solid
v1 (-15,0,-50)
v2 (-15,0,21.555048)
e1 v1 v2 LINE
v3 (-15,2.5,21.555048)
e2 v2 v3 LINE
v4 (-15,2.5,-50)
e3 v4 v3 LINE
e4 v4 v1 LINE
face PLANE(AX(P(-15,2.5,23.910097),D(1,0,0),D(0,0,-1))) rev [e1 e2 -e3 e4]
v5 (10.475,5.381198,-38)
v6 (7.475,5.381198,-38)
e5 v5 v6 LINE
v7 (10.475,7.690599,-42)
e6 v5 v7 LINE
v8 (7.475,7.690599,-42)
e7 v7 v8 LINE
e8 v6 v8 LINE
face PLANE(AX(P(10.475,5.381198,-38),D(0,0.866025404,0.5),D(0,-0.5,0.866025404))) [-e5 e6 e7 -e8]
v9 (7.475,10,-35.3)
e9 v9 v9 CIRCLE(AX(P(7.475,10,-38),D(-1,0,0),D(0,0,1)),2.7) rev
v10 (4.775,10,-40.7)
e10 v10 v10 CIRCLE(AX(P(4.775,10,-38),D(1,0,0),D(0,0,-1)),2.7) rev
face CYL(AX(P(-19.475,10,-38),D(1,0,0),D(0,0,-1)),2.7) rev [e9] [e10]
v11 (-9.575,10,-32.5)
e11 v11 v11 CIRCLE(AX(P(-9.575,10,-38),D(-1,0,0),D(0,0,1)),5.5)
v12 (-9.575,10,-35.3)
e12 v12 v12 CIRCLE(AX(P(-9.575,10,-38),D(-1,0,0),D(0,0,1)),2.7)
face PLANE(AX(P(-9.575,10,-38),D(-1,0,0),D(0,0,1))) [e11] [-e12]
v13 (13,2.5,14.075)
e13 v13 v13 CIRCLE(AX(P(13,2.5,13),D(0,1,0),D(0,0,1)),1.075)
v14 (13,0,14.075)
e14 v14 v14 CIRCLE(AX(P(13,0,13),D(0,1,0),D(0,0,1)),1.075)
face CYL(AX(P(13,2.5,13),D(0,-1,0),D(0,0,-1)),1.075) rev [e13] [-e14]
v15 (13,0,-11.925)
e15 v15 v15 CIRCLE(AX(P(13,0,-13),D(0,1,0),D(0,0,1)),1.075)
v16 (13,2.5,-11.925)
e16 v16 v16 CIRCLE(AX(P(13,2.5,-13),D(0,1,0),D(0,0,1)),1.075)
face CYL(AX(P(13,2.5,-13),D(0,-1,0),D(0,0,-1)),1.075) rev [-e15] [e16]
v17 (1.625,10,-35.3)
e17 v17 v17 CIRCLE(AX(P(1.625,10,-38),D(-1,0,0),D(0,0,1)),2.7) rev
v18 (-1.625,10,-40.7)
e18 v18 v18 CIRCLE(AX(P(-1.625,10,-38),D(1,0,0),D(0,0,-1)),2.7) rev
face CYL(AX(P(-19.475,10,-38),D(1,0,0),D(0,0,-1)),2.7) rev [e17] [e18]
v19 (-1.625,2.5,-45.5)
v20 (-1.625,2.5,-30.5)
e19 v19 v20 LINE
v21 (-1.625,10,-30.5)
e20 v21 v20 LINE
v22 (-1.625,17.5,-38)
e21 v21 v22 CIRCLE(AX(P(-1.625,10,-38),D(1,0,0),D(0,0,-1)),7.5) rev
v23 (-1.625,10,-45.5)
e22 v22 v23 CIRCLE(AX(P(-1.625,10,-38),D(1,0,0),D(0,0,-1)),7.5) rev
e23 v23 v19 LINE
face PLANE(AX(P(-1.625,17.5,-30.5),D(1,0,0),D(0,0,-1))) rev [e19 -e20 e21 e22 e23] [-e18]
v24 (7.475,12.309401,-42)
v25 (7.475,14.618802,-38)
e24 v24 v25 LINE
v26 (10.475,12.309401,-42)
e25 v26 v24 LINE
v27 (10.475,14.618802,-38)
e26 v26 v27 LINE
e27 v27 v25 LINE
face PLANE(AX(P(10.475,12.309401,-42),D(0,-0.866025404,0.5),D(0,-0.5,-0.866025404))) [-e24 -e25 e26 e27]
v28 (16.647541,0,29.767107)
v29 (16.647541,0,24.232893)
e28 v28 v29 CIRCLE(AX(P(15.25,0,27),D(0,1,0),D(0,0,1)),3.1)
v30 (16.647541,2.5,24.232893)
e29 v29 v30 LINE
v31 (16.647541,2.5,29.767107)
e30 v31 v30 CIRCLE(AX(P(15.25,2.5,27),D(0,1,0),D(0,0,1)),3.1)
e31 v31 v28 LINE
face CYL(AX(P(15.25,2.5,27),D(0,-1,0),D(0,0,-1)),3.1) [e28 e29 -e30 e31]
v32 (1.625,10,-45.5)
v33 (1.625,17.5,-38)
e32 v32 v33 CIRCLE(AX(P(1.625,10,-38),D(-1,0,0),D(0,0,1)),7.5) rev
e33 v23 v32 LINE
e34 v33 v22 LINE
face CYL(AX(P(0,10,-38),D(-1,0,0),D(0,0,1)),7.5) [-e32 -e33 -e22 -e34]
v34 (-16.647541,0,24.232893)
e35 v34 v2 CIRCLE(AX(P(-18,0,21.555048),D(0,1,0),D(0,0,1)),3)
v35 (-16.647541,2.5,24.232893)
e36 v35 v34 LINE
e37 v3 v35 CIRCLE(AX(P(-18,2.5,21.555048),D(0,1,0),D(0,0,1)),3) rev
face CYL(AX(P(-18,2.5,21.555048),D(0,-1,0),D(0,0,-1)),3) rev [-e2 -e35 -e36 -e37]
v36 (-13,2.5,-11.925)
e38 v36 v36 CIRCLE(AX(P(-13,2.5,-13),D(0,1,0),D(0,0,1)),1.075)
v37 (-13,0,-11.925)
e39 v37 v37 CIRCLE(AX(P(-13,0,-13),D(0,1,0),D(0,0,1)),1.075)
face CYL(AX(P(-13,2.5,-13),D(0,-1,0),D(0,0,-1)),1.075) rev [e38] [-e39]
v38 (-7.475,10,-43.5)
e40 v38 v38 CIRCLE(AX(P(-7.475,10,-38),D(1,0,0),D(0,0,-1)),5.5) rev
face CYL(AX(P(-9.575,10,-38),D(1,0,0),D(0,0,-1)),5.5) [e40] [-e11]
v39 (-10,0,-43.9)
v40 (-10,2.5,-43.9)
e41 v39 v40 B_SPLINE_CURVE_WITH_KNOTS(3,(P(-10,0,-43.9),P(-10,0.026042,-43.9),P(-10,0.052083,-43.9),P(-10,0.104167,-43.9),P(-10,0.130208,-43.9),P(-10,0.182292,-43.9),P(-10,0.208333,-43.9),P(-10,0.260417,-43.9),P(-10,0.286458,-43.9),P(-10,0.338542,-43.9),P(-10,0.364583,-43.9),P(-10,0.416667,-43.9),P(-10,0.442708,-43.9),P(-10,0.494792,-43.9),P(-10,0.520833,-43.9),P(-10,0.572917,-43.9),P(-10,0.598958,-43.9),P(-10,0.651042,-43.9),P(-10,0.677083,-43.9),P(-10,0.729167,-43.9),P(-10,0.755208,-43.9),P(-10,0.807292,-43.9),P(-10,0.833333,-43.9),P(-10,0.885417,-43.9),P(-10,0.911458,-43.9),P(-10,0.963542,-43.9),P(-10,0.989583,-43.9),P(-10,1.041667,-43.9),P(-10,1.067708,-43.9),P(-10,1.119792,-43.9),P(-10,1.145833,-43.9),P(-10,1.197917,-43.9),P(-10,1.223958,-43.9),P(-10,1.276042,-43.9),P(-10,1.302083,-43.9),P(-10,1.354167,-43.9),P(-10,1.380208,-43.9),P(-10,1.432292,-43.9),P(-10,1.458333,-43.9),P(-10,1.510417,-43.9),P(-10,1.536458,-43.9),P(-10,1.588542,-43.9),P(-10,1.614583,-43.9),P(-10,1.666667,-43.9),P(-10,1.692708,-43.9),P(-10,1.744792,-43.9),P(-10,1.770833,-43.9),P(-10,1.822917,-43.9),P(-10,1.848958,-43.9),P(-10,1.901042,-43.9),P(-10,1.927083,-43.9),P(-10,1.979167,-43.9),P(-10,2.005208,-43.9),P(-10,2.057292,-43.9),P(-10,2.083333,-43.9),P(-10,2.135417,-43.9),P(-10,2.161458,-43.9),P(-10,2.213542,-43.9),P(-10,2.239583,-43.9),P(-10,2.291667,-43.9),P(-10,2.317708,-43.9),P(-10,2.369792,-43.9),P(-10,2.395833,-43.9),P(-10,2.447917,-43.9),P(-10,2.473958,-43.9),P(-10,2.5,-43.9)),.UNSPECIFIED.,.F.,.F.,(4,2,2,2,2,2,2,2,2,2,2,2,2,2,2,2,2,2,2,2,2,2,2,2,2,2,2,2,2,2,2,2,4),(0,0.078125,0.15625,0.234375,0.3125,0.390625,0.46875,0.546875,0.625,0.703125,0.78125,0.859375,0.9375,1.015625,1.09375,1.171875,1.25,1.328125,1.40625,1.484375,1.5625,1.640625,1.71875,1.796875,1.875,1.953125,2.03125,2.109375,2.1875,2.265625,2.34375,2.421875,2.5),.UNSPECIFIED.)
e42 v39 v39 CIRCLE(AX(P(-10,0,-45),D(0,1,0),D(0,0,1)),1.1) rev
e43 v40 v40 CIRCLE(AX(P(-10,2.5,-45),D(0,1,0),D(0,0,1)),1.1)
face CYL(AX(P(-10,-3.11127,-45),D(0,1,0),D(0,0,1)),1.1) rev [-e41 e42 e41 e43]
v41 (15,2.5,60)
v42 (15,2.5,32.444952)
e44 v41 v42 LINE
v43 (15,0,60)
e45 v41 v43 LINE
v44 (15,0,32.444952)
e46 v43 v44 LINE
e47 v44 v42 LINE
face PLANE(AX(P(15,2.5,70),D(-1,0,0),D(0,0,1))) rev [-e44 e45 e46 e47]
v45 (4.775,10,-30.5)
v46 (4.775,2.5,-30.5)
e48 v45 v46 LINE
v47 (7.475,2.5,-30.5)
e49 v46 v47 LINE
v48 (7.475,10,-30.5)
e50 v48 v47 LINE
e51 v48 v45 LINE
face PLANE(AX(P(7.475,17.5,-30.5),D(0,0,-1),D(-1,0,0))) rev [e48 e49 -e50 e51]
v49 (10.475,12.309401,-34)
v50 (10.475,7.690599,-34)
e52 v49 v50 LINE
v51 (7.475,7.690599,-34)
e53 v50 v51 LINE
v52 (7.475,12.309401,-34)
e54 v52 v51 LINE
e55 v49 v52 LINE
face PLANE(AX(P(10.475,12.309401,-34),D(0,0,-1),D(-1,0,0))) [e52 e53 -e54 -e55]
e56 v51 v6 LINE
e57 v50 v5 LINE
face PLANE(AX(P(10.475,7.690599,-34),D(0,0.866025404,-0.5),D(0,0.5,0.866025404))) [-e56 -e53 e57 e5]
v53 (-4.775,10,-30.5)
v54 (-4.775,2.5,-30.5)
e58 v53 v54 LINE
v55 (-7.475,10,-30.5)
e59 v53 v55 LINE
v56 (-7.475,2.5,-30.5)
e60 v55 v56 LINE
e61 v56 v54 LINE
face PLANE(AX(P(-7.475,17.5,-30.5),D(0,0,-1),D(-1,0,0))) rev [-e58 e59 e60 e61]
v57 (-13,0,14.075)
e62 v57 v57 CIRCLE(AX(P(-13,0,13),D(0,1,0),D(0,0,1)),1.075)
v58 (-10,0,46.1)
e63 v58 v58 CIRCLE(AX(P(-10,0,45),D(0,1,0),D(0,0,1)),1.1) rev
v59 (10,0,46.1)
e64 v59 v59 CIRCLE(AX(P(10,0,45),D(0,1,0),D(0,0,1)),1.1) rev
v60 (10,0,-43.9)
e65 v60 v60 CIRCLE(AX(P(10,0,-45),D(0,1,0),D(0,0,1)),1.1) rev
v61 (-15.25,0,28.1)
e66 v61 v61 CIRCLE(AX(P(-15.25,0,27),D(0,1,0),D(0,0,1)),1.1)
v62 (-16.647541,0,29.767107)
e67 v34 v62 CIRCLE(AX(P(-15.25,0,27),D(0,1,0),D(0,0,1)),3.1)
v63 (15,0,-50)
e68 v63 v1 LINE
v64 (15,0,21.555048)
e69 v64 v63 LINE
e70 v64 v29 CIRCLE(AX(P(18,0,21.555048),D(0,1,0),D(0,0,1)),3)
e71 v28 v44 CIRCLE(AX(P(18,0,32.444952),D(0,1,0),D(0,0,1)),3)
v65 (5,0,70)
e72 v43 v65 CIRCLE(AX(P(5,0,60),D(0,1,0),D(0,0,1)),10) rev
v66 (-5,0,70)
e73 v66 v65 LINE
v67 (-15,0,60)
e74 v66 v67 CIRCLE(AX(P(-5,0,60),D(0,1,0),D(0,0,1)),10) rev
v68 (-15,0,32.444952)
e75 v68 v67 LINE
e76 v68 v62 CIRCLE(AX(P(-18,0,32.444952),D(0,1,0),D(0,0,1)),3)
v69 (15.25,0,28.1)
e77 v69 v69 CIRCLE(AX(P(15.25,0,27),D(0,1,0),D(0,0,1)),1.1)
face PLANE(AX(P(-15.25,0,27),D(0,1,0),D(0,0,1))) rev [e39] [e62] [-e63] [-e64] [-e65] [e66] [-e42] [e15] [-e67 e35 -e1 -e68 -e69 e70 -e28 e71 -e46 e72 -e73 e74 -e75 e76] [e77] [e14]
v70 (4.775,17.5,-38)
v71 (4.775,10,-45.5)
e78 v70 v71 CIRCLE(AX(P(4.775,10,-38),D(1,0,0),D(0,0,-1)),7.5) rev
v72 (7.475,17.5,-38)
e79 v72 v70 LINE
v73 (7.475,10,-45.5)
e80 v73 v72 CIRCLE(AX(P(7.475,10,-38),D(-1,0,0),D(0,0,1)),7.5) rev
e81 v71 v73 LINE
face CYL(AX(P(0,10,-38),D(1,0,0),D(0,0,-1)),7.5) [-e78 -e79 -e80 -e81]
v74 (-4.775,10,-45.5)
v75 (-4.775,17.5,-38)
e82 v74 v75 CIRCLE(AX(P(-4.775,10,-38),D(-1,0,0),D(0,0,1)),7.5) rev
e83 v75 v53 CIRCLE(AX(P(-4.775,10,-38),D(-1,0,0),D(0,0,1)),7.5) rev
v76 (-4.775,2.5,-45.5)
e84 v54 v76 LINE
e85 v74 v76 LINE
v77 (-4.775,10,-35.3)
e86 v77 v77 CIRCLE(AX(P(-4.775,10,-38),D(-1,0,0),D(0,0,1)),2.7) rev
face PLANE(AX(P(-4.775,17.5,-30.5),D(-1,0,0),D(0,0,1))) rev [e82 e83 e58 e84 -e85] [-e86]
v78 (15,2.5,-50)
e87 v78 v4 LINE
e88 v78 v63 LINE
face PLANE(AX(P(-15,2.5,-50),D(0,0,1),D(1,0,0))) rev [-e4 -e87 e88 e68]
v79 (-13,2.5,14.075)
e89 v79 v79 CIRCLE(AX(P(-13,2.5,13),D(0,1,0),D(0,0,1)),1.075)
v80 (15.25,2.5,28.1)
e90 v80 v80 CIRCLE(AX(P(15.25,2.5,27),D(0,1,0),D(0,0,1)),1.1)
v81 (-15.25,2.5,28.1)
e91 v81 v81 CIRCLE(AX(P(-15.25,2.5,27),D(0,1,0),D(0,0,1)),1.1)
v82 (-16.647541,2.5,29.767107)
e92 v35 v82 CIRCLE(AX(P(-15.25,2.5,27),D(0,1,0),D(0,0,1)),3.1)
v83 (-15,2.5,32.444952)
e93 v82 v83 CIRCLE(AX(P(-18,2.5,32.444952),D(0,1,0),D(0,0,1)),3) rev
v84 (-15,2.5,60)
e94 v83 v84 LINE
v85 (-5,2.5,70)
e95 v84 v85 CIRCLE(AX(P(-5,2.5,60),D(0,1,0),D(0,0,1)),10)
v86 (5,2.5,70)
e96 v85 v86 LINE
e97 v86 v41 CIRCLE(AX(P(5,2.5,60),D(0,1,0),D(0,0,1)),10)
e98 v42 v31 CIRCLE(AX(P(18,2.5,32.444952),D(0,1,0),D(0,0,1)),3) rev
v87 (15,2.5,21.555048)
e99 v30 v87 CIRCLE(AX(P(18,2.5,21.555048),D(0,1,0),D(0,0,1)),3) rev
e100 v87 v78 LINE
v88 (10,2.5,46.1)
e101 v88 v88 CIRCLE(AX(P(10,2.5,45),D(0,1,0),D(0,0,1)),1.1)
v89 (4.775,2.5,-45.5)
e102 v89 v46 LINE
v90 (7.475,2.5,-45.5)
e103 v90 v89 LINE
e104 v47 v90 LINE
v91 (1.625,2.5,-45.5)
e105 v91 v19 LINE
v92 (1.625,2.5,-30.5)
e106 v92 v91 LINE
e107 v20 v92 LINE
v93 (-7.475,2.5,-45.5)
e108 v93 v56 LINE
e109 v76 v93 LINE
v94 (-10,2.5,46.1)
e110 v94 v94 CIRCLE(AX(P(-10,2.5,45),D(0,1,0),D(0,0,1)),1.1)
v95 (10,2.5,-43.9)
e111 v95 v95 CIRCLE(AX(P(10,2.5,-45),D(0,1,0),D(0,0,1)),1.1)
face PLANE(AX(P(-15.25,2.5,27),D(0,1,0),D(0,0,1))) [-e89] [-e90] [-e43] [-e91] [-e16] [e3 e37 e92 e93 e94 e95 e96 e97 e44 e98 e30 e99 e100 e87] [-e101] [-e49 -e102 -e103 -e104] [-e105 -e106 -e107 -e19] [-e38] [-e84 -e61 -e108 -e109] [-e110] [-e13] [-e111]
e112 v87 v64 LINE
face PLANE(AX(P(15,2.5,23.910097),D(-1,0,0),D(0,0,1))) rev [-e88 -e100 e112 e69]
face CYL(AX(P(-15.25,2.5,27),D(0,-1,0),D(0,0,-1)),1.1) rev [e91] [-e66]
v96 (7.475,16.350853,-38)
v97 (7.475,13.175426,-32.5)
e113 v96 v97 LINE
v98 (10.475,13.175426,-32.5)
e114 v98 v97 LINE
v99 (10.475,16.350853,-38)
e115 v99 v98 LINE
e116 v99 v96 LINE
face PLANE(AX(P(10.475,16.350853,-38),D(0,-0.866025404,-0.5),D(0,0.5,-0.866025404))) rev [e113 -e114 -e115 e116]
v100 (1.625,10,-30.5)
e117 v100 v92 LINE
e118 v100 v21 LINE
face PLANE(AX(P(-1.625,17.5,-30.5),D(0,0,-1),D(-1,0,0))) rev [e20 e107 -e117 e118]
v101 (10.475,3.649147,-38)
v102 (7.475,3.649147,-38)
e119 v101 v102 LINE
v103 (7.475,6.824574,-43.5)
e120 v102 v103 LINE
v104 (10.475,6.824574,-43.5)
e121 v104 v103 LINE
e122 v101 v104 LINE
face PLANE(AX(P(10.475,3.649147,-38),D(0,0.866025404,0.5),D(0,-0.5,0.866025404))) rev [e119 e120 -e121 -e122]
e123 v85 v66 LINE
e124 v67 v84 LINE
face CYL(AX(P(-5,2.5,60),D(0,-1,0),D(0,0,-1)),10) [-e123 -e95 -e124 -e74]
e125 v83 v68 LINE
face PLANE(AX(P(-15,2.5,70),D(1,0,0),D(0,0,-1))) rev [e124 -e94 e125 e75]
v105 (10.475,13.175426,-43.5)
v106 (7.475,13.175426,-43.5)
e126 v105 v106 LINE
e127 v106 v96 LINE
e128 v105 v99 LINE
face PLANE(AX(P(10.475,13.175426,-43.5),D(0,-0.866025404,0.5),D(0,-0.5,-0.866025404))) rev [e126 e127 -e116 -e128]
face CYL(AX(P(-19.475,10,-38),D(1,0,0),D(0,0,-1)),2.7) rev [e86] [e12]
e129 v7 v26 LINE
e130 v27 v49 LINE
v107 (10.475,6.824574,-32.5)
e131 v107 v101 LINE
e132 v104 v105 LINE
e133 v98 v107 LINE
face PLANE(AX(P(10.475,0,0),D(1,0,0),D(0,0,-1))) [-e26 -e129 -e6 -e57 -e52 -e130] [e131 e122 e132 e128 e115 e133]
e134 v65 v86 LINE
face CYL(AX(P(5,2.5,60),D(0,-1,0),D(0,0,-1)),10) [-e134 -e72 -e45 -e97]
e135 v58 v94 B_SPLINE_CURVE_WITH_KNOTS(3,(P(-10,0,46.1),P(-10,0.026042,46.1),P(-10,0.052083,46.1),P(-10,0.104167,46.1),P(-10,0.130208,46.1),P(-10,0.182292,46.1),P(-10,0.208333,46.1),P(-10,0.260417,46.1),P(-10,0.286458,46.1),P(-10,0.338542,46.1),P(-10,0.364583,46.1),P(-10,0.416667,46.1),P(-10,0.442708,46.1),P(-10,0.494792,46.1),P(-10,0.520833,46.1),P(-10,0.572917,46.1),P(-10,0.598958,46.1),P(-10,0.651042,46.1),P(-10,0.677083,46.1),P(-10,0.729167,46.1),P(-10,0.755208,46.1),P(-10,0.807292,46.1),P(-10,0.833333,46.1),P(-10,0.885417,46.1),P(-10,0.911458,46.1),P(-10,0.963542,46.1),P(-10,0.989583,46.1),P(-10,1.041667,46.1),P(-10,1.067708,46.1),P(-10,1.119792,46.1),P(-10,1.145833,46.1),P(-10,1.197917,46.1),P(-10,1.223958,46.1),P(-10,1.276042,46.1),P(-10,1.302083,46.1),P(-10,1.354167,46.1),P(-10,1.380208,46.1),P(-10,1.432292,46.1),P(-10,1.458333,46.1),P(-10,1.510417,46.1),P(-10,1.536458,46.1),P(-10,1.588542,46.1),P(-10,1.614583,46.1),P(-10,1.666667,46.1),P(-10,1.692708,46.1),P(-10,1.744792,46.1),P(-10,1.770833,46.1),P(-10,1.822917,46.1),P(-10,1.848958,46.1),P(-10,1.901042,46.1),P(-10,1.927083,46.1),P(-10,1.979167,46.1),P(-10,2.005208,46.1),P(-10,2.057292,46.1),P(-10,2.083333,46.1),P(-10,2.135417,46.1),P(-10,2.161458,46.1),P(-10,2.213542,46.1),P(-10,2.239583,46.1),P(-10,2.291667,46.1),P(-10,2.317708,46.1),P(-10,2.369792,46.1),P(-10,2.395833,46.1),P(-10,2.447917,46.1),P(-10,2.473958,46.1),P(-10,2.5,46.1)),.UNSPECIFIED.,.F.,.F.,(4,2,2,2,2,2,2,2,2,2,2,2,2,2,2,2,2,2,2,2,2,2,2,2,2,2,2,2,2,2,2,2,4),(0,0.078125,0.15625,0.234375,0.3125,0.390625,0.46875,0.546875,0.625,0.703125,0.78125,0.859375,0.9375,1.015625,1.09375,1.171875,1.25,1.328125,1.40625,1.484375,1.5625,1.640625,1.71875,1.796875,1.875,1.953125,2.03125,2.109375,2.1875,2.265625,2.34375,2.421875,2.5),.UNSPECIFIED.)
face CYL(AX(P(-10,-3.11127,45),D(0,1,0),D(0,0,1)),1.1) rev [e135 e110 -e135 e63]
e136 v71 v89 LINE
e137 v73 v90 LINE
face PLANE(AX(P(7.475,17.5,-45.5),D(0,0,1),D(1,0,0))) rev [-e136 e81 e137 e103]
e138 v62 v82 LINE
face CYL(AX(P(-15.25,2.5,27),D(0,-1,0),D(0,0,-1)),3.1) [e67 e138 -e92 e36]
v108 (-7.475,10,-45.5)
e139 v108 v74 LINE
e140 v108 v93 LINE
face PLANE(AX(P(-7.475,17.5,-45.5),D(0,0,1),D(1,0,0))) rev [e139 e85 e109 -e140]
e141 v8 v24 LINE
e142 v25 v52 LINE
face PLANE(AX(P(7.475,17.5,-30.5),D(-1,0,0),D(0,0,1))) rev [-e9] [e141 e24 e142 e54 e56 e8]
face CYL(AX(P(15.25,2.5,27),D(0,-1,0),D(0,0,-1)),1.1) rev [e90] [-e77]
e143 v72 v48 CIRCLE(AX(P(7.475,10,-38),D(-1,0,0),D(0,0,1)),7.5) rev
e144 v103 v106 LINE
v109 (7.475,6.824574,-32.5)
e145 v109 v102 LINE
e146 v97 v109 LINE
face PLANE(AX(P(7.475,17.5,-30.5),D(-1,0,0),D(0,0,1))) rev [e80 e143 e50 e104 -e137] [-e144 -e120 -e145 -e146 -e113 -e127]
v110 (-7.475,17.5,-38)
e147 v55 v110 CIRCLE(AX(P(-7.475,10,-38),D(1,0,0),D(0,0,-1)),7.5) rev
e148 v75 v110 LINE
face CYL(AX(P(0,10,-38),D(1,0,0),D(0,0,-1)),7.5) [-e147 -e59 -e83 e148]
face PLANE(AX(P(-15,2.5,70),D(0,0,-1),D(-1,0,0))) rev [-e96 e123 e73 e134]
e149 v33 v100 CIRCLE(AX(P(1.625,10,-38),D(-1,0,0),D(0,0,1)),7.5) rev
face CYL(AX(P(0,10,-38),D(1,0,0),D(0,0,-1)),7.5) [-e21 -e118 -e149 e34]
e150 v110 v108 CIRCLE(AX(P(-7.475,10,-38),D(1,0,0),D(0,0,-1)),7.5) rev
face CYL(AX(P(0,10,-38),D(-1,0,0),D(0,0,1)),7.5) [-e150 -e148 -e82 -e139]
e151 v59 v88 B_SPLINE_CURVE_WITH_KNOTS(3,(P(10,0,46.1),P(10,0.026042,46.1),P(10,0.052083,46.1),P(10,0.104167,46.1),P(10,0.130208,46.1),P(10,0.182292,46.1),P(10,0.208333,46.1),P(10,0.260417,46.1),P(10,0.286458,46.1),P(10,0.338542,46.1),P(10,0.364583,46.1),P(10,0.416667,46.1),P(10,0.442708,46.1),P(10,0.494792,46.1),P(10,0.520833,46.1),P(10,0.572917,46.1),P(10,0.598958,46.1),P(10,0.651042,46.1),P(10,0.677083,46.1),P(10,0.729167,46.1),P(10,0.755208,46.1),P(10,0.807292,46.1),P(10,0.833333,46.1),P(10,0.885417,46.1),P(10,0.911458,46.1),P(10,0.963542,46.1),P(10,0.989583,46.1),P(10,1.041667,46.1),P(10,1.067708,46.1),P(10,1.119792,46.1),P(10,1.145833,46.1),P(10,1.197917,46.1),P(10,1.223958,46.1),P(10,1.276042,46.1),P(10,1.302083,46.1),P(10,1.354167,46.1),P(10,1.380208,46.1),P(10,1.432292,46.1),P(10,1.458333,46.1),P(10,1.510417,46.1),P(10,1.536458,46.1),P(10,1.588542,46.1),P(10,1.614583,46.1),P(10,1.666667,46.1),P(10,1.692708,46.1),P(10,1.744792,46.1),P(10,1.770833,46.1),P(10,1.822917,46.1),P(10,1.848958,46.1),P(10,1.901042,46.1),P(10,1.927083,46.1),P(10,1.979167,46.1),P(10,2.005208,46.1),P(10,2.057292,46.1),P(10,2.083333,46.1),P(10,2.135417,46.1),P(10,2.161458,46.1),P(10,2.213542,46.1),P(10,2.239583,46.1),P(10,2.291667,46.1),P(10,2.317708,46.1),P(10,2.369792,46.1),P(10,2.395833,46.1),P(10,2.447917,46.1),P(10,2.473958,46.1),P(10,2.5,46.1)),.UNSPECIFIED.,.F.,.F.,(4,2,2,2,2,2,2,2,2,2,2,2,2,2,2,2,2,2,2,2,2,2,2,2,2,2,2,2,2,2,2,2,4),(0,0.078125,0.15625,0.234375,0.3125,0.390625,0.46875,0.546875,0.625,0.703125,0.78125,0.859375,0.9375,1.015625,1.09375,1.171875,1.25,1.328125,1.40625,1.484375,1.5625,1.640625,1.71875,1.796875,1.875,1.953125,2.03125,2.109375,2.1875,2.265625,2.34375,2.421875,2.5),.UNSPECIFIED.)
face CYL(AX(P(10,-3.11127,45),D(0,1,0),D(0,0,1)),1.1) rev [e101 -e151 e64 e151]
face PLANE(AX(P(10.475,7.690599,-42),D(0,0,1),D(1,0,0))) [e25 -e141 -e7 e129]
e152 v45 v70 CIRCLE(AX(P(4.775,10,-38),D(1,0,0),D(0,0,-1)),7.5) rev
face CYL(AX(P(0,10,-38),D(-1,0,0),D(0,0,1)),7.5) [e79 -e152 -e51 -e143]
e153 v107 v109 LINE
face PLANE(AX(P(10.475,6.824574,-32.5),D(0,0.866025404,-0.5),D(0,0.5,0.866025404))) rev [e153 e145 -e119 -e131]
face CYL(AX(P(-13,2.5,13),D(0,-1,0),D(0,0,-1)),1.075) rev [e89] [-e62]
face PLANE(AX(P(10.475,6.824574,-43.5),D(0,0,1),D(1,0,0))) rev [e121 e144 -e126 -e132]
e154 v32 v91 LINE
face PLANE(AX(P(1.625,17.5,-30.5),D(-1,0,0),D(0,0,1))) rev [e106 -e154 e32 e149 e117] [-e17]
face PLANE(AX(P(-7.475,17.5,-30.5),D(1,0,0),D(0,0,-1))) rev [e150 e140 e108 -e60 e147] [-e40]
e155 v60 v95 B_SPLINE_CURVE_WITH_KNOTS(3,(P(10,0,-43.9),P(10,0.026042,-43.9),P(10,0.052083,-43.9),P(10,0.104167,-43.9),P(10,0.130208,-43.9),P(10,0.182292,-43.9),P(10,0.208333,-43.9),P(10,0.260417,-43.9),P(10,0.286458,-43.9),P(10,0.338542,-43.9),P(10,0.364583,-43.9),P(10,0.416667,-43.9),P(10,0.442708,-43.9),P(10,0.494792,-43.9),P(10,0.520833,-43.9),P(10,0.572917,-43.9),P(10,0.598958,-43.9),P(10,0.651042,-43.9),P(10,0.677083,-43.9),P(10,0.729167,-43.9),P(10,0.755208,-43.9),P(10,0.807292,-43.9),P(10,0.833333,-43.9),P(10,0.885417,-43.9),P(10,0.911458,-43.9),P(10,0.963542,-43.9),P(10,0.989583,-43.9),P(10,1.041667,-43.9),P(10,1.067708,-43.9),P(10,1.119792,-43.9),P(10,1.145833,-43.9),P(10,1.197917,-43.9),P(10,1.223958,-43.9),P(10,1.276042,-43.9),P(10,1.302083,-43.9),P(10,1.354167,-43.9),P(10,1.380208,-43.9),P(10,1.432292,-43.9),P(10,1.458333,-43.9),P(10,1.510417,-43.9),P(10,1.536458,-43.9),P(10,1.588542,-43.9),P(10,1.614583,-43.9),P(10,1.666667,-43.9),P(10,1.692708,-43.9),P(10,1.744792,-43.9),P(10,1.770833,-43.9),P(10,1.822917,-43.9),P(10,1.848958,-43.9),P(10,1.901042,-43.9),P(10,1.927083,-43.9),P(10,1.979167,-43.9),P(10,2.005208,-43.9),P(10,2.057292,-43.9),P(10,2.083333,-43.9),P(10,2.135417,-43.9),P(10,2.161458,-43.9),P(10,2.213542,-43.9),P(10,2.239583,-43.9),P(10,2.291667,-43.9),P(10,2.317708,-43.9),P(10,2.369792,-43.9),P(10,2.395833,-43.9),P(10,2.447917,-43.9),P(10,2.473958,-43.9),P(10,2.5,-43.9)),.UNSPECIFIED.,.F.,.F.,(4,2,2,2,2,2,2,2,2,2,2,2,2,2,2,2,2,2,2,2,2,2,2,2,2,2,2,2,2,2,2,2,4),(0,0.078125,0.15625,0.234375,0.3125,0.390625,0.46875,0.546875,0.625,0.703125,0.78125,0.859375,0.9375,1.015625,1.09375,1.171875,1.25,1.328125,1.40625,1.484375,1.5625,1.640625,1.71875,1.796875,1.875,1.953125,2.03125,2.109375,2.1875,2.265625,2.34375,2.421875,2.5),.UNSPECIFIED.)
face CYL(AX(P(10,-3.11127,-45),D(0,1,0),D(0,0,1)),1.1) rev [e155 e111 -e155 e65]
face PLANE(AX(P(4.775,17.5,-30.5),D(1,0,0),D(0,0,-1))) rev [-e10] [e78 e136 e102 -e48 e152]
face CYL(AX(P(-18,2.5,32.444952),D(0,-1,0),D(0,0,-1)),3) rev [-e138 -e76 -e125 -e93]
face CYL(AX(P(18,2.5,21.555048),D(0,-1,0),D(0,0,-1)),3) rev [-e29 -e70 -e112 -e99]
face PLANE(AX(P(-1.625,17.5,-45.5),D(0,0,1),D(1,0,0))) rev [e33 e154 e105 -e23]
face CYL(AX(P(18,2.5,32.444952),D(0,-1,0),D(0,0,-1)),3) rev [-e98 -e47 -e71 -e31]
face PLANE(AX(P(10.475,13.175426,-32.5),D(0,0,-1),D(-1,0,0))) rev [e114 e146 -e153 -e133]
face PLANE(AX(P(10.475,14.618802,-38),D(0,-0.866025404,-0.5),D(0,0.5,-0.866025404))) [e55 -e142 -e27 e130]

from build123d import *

# Parameters (mm, degrees)
SKETCH29_R              = 1.1
SKETCH29_R_2            = 1.075
BOSS_EXTRUDE19_DEPTH    = 2.5
SKETCH31_R              = 1.1
CUT_EXTRUDE2_DEPTH      = 2.5
SKETCH15_W              = 3.25
SKETCH15_H              = 15
SKETCH15_W_2            = 2.7
BOSS_EXTRUDE11_DEPTH    = 15
FILLET10_R              = 7.5
CUT_EXTRUDE1_DEPTH      = 12
CUT_EXTRUDE1_DEPTH_BACK = 17
SKETCH16_R              = 2.7
BOSS_EXTRUDE12_START    = 2.1
SKETCH17_R              = 5.5
SKETCH17_R_2            = 2.7
BOSS_EXTRUDE12_DEPTH    = 2.1
BOSS_EXTRUDE17_DEPTH    = 3
FILLET11_R              = 3
FILLET12_R              = 10


with BuildPart() as part:
    # Sketch29 → Boss-Extrude19 (new body)
    with BuildSketch(Plane(origin=(0, 0, 0), x_dir=(1, 0, 0), z_dir=(0, 1, 0))):
        with BuildLine():
            Line((-15, -70), (15, -70))
            Line((15, -70), (15, -30.089902911))
            ThreePointArc((15, -30.089902911), (18.35, -27), (15, -23.910097089))
            Line((15, -23.910097089), (15, 50))
            Line((15, 50), (-15, 50))
            Line((-15, 50), (-15, -23.910097089))
            ThreePointArc((-15, -23.910097089), (-18.35, -27), (-15, -30.089902911))
            Line((-15, -30.089902911), (-15, -70))
        make_face()
        with Locations(Location((-15.25, -27, 0), (0, 0, 270))):
            Circle(SKETCH29_R, mode=Mode.SUBTRACT)
        with Locations(Location((-13, 13, 0), (0, 0, 270))):
            Circle(SKETCH29_R_2, mode=Mode.SUBTRACT)
        with Locations(Location((13, 13, 0), (0, 0, 270))):
            Circle(SKETCH29_R_2, mode=Mode.SUBTRACT)
        with Locations(Location((13, -13, 0), (0, 0, 270))):
            Circle(SKETCH29_R_2, mode=Mode.SUBTRACT)
        with Locations(Location((-13, -13, 0), (0, 0, 270))):
            Circle(SKETCH29_R_2, mode=Mode.SUBTRACT)
        with Locations(Location((15.25, -27, 0), (0, 0, 270))):
            Circle(SKETCH29_R, mode=Mode.SUBTRACT)
    extrude(amount=BOSS_EXTRUDE19_DEPTH)

    # Sketch31 → Cut-Extrude2 (cut)
    with BuildSketch(Plane(origin=(0, 2.5, 0), x_dir=(1, 0, 0), z_dir=(0, 1, 0))):
        with Locations(Location((-10, -45, 0), (0, 0, 270))):
            Circle(SKETCH31_R)
        with Locations(Location((10, -45, 0), (0, 0, 270))):
            Circle(SKETCH31_R)
        with Locations(Location((-10, 45, 0), (0, 0, 270))):
            Circle(SKETCH31_R)
        with Locations(Location((10, 45, 0), (0, 0, 270))):
            Circle(SKETCH31_R)
    extrude(amount=-CUT_EXTRUDE2_DEPTH, mode=Mode.SUBTRACT)

    # Sketch15 → Boss-Extrude11 (add)
    with BuildSketch(Plane(origin=(0, 2.5, 0), x_dir=(1, 0, 0), z_dir=(0, 1, 0))):
        with Locations((0, 38)):
            Rectangle(SKETCH15_W, SKETCH15_H)
        with Locations((-6.125, 38)):
            Rectangle(SKETCH15_W_2, SKETCH15_H)
        with Locations((6.125, 38)):
            Rectangle(SKETCH15_W_2, SKETCH15_H)
    extrude(amount=BOSS_EXTRUDE11_DEPTH)

    # Fillet10
    fillet10_edges = [part.edges().sort_by_distance(p)[0] for p in [
        (6.125, 17.5, -30.5),
        (6.125, 17.5, -45.5),
        (0, 17.5, -30.5),
        (0, 17.5, -45.5),
        (-6.125, 17.5, -30.5),
        (-6.125, 17.5, -45.5),
    ]]
    fillet(fillet10_edges, radius=FILLET10_R - 0.0001)  # a hair under: the kernel refuses the full size

    # Sketch16 → Cut-Extrude1 (cut, two sides: drawn at the far end of the back side and taken through both)
    with BuildSketch(Plane.ZY.offset(7.475).offset(-CUT_EXTRUDE1_DEPTH_BACK)):
        with Locations(Location((-38, 10, 0), (0, 0, 180))):
            Circle(SKETCH16_R)
    extrude(amount=CUT_EXTRUDE1_DEPTH + CUT_EXTRUDE1_DEPTH_BACK, mode=Mode.SUBTRACT)

    # Sketch17 → Boss-Extrude12 (add)
    with BuildSketch(Plane.ZY.offset(7.475).offset(BOSS_EXTRUDE12_START)):
        with Locations(Location((-38, 10, 0), (0, 0, 180))):
            Circle(SKETCH17_R)
        with Locations(Location((-38, 10, 0), (0, 0, 180))):
            Circle(SKETCH17_R_2, mode=Mode.SUBTRACT)
    extrude(amount=-BOSS_EXTRUDE12_DEPTH)

    # Sketch23 → Boss-Extrude17 (add)
    with BuildSketch(Plane(origin=(7.475, 0, 0), x_dir=(0, 0, -1), z_dir=(1, 0, 0))):
        Polygon((38, 16.350852961), (32.5, 13.175426481), (32.5, 6.824573519), (38, 3.649147039), (43.5, 6.824573519), (43.5, 13.175426481), align=None)
        Polygon((38, 14.618802154), (34, 12.309401077), (34, 7.690598923), (38, 5.381197846), (42, 7.690598923), (42, 12.309401077), align=None, mode=Mode.SUBTRACT)
    extrude(amount=BOSS_EXTRUDE17_DEPTH)

    # Fillet11
    fillet11_edges = [part.edges().sort_by_distance(p)[0] for p in [
        (15, 1.25, 23.910097089),
        (15, 1.25, 30.089902911),
        (-15, 1.25, 30.089902911),
        (-15, 1.25, 23.910097089),
    ]]
    fillet(fillet11_edges, radius=FILLET11_R)

    # Fillet12
    fillet12_edges = [part.edges().sort_by_distance(p)[0] for p in [
        (15, 1.25, 70),
        (-15, 1.25, 70),
    ]]
    fillet(fillet12_edges, radius=FILLET12_R)


solid = part.part
